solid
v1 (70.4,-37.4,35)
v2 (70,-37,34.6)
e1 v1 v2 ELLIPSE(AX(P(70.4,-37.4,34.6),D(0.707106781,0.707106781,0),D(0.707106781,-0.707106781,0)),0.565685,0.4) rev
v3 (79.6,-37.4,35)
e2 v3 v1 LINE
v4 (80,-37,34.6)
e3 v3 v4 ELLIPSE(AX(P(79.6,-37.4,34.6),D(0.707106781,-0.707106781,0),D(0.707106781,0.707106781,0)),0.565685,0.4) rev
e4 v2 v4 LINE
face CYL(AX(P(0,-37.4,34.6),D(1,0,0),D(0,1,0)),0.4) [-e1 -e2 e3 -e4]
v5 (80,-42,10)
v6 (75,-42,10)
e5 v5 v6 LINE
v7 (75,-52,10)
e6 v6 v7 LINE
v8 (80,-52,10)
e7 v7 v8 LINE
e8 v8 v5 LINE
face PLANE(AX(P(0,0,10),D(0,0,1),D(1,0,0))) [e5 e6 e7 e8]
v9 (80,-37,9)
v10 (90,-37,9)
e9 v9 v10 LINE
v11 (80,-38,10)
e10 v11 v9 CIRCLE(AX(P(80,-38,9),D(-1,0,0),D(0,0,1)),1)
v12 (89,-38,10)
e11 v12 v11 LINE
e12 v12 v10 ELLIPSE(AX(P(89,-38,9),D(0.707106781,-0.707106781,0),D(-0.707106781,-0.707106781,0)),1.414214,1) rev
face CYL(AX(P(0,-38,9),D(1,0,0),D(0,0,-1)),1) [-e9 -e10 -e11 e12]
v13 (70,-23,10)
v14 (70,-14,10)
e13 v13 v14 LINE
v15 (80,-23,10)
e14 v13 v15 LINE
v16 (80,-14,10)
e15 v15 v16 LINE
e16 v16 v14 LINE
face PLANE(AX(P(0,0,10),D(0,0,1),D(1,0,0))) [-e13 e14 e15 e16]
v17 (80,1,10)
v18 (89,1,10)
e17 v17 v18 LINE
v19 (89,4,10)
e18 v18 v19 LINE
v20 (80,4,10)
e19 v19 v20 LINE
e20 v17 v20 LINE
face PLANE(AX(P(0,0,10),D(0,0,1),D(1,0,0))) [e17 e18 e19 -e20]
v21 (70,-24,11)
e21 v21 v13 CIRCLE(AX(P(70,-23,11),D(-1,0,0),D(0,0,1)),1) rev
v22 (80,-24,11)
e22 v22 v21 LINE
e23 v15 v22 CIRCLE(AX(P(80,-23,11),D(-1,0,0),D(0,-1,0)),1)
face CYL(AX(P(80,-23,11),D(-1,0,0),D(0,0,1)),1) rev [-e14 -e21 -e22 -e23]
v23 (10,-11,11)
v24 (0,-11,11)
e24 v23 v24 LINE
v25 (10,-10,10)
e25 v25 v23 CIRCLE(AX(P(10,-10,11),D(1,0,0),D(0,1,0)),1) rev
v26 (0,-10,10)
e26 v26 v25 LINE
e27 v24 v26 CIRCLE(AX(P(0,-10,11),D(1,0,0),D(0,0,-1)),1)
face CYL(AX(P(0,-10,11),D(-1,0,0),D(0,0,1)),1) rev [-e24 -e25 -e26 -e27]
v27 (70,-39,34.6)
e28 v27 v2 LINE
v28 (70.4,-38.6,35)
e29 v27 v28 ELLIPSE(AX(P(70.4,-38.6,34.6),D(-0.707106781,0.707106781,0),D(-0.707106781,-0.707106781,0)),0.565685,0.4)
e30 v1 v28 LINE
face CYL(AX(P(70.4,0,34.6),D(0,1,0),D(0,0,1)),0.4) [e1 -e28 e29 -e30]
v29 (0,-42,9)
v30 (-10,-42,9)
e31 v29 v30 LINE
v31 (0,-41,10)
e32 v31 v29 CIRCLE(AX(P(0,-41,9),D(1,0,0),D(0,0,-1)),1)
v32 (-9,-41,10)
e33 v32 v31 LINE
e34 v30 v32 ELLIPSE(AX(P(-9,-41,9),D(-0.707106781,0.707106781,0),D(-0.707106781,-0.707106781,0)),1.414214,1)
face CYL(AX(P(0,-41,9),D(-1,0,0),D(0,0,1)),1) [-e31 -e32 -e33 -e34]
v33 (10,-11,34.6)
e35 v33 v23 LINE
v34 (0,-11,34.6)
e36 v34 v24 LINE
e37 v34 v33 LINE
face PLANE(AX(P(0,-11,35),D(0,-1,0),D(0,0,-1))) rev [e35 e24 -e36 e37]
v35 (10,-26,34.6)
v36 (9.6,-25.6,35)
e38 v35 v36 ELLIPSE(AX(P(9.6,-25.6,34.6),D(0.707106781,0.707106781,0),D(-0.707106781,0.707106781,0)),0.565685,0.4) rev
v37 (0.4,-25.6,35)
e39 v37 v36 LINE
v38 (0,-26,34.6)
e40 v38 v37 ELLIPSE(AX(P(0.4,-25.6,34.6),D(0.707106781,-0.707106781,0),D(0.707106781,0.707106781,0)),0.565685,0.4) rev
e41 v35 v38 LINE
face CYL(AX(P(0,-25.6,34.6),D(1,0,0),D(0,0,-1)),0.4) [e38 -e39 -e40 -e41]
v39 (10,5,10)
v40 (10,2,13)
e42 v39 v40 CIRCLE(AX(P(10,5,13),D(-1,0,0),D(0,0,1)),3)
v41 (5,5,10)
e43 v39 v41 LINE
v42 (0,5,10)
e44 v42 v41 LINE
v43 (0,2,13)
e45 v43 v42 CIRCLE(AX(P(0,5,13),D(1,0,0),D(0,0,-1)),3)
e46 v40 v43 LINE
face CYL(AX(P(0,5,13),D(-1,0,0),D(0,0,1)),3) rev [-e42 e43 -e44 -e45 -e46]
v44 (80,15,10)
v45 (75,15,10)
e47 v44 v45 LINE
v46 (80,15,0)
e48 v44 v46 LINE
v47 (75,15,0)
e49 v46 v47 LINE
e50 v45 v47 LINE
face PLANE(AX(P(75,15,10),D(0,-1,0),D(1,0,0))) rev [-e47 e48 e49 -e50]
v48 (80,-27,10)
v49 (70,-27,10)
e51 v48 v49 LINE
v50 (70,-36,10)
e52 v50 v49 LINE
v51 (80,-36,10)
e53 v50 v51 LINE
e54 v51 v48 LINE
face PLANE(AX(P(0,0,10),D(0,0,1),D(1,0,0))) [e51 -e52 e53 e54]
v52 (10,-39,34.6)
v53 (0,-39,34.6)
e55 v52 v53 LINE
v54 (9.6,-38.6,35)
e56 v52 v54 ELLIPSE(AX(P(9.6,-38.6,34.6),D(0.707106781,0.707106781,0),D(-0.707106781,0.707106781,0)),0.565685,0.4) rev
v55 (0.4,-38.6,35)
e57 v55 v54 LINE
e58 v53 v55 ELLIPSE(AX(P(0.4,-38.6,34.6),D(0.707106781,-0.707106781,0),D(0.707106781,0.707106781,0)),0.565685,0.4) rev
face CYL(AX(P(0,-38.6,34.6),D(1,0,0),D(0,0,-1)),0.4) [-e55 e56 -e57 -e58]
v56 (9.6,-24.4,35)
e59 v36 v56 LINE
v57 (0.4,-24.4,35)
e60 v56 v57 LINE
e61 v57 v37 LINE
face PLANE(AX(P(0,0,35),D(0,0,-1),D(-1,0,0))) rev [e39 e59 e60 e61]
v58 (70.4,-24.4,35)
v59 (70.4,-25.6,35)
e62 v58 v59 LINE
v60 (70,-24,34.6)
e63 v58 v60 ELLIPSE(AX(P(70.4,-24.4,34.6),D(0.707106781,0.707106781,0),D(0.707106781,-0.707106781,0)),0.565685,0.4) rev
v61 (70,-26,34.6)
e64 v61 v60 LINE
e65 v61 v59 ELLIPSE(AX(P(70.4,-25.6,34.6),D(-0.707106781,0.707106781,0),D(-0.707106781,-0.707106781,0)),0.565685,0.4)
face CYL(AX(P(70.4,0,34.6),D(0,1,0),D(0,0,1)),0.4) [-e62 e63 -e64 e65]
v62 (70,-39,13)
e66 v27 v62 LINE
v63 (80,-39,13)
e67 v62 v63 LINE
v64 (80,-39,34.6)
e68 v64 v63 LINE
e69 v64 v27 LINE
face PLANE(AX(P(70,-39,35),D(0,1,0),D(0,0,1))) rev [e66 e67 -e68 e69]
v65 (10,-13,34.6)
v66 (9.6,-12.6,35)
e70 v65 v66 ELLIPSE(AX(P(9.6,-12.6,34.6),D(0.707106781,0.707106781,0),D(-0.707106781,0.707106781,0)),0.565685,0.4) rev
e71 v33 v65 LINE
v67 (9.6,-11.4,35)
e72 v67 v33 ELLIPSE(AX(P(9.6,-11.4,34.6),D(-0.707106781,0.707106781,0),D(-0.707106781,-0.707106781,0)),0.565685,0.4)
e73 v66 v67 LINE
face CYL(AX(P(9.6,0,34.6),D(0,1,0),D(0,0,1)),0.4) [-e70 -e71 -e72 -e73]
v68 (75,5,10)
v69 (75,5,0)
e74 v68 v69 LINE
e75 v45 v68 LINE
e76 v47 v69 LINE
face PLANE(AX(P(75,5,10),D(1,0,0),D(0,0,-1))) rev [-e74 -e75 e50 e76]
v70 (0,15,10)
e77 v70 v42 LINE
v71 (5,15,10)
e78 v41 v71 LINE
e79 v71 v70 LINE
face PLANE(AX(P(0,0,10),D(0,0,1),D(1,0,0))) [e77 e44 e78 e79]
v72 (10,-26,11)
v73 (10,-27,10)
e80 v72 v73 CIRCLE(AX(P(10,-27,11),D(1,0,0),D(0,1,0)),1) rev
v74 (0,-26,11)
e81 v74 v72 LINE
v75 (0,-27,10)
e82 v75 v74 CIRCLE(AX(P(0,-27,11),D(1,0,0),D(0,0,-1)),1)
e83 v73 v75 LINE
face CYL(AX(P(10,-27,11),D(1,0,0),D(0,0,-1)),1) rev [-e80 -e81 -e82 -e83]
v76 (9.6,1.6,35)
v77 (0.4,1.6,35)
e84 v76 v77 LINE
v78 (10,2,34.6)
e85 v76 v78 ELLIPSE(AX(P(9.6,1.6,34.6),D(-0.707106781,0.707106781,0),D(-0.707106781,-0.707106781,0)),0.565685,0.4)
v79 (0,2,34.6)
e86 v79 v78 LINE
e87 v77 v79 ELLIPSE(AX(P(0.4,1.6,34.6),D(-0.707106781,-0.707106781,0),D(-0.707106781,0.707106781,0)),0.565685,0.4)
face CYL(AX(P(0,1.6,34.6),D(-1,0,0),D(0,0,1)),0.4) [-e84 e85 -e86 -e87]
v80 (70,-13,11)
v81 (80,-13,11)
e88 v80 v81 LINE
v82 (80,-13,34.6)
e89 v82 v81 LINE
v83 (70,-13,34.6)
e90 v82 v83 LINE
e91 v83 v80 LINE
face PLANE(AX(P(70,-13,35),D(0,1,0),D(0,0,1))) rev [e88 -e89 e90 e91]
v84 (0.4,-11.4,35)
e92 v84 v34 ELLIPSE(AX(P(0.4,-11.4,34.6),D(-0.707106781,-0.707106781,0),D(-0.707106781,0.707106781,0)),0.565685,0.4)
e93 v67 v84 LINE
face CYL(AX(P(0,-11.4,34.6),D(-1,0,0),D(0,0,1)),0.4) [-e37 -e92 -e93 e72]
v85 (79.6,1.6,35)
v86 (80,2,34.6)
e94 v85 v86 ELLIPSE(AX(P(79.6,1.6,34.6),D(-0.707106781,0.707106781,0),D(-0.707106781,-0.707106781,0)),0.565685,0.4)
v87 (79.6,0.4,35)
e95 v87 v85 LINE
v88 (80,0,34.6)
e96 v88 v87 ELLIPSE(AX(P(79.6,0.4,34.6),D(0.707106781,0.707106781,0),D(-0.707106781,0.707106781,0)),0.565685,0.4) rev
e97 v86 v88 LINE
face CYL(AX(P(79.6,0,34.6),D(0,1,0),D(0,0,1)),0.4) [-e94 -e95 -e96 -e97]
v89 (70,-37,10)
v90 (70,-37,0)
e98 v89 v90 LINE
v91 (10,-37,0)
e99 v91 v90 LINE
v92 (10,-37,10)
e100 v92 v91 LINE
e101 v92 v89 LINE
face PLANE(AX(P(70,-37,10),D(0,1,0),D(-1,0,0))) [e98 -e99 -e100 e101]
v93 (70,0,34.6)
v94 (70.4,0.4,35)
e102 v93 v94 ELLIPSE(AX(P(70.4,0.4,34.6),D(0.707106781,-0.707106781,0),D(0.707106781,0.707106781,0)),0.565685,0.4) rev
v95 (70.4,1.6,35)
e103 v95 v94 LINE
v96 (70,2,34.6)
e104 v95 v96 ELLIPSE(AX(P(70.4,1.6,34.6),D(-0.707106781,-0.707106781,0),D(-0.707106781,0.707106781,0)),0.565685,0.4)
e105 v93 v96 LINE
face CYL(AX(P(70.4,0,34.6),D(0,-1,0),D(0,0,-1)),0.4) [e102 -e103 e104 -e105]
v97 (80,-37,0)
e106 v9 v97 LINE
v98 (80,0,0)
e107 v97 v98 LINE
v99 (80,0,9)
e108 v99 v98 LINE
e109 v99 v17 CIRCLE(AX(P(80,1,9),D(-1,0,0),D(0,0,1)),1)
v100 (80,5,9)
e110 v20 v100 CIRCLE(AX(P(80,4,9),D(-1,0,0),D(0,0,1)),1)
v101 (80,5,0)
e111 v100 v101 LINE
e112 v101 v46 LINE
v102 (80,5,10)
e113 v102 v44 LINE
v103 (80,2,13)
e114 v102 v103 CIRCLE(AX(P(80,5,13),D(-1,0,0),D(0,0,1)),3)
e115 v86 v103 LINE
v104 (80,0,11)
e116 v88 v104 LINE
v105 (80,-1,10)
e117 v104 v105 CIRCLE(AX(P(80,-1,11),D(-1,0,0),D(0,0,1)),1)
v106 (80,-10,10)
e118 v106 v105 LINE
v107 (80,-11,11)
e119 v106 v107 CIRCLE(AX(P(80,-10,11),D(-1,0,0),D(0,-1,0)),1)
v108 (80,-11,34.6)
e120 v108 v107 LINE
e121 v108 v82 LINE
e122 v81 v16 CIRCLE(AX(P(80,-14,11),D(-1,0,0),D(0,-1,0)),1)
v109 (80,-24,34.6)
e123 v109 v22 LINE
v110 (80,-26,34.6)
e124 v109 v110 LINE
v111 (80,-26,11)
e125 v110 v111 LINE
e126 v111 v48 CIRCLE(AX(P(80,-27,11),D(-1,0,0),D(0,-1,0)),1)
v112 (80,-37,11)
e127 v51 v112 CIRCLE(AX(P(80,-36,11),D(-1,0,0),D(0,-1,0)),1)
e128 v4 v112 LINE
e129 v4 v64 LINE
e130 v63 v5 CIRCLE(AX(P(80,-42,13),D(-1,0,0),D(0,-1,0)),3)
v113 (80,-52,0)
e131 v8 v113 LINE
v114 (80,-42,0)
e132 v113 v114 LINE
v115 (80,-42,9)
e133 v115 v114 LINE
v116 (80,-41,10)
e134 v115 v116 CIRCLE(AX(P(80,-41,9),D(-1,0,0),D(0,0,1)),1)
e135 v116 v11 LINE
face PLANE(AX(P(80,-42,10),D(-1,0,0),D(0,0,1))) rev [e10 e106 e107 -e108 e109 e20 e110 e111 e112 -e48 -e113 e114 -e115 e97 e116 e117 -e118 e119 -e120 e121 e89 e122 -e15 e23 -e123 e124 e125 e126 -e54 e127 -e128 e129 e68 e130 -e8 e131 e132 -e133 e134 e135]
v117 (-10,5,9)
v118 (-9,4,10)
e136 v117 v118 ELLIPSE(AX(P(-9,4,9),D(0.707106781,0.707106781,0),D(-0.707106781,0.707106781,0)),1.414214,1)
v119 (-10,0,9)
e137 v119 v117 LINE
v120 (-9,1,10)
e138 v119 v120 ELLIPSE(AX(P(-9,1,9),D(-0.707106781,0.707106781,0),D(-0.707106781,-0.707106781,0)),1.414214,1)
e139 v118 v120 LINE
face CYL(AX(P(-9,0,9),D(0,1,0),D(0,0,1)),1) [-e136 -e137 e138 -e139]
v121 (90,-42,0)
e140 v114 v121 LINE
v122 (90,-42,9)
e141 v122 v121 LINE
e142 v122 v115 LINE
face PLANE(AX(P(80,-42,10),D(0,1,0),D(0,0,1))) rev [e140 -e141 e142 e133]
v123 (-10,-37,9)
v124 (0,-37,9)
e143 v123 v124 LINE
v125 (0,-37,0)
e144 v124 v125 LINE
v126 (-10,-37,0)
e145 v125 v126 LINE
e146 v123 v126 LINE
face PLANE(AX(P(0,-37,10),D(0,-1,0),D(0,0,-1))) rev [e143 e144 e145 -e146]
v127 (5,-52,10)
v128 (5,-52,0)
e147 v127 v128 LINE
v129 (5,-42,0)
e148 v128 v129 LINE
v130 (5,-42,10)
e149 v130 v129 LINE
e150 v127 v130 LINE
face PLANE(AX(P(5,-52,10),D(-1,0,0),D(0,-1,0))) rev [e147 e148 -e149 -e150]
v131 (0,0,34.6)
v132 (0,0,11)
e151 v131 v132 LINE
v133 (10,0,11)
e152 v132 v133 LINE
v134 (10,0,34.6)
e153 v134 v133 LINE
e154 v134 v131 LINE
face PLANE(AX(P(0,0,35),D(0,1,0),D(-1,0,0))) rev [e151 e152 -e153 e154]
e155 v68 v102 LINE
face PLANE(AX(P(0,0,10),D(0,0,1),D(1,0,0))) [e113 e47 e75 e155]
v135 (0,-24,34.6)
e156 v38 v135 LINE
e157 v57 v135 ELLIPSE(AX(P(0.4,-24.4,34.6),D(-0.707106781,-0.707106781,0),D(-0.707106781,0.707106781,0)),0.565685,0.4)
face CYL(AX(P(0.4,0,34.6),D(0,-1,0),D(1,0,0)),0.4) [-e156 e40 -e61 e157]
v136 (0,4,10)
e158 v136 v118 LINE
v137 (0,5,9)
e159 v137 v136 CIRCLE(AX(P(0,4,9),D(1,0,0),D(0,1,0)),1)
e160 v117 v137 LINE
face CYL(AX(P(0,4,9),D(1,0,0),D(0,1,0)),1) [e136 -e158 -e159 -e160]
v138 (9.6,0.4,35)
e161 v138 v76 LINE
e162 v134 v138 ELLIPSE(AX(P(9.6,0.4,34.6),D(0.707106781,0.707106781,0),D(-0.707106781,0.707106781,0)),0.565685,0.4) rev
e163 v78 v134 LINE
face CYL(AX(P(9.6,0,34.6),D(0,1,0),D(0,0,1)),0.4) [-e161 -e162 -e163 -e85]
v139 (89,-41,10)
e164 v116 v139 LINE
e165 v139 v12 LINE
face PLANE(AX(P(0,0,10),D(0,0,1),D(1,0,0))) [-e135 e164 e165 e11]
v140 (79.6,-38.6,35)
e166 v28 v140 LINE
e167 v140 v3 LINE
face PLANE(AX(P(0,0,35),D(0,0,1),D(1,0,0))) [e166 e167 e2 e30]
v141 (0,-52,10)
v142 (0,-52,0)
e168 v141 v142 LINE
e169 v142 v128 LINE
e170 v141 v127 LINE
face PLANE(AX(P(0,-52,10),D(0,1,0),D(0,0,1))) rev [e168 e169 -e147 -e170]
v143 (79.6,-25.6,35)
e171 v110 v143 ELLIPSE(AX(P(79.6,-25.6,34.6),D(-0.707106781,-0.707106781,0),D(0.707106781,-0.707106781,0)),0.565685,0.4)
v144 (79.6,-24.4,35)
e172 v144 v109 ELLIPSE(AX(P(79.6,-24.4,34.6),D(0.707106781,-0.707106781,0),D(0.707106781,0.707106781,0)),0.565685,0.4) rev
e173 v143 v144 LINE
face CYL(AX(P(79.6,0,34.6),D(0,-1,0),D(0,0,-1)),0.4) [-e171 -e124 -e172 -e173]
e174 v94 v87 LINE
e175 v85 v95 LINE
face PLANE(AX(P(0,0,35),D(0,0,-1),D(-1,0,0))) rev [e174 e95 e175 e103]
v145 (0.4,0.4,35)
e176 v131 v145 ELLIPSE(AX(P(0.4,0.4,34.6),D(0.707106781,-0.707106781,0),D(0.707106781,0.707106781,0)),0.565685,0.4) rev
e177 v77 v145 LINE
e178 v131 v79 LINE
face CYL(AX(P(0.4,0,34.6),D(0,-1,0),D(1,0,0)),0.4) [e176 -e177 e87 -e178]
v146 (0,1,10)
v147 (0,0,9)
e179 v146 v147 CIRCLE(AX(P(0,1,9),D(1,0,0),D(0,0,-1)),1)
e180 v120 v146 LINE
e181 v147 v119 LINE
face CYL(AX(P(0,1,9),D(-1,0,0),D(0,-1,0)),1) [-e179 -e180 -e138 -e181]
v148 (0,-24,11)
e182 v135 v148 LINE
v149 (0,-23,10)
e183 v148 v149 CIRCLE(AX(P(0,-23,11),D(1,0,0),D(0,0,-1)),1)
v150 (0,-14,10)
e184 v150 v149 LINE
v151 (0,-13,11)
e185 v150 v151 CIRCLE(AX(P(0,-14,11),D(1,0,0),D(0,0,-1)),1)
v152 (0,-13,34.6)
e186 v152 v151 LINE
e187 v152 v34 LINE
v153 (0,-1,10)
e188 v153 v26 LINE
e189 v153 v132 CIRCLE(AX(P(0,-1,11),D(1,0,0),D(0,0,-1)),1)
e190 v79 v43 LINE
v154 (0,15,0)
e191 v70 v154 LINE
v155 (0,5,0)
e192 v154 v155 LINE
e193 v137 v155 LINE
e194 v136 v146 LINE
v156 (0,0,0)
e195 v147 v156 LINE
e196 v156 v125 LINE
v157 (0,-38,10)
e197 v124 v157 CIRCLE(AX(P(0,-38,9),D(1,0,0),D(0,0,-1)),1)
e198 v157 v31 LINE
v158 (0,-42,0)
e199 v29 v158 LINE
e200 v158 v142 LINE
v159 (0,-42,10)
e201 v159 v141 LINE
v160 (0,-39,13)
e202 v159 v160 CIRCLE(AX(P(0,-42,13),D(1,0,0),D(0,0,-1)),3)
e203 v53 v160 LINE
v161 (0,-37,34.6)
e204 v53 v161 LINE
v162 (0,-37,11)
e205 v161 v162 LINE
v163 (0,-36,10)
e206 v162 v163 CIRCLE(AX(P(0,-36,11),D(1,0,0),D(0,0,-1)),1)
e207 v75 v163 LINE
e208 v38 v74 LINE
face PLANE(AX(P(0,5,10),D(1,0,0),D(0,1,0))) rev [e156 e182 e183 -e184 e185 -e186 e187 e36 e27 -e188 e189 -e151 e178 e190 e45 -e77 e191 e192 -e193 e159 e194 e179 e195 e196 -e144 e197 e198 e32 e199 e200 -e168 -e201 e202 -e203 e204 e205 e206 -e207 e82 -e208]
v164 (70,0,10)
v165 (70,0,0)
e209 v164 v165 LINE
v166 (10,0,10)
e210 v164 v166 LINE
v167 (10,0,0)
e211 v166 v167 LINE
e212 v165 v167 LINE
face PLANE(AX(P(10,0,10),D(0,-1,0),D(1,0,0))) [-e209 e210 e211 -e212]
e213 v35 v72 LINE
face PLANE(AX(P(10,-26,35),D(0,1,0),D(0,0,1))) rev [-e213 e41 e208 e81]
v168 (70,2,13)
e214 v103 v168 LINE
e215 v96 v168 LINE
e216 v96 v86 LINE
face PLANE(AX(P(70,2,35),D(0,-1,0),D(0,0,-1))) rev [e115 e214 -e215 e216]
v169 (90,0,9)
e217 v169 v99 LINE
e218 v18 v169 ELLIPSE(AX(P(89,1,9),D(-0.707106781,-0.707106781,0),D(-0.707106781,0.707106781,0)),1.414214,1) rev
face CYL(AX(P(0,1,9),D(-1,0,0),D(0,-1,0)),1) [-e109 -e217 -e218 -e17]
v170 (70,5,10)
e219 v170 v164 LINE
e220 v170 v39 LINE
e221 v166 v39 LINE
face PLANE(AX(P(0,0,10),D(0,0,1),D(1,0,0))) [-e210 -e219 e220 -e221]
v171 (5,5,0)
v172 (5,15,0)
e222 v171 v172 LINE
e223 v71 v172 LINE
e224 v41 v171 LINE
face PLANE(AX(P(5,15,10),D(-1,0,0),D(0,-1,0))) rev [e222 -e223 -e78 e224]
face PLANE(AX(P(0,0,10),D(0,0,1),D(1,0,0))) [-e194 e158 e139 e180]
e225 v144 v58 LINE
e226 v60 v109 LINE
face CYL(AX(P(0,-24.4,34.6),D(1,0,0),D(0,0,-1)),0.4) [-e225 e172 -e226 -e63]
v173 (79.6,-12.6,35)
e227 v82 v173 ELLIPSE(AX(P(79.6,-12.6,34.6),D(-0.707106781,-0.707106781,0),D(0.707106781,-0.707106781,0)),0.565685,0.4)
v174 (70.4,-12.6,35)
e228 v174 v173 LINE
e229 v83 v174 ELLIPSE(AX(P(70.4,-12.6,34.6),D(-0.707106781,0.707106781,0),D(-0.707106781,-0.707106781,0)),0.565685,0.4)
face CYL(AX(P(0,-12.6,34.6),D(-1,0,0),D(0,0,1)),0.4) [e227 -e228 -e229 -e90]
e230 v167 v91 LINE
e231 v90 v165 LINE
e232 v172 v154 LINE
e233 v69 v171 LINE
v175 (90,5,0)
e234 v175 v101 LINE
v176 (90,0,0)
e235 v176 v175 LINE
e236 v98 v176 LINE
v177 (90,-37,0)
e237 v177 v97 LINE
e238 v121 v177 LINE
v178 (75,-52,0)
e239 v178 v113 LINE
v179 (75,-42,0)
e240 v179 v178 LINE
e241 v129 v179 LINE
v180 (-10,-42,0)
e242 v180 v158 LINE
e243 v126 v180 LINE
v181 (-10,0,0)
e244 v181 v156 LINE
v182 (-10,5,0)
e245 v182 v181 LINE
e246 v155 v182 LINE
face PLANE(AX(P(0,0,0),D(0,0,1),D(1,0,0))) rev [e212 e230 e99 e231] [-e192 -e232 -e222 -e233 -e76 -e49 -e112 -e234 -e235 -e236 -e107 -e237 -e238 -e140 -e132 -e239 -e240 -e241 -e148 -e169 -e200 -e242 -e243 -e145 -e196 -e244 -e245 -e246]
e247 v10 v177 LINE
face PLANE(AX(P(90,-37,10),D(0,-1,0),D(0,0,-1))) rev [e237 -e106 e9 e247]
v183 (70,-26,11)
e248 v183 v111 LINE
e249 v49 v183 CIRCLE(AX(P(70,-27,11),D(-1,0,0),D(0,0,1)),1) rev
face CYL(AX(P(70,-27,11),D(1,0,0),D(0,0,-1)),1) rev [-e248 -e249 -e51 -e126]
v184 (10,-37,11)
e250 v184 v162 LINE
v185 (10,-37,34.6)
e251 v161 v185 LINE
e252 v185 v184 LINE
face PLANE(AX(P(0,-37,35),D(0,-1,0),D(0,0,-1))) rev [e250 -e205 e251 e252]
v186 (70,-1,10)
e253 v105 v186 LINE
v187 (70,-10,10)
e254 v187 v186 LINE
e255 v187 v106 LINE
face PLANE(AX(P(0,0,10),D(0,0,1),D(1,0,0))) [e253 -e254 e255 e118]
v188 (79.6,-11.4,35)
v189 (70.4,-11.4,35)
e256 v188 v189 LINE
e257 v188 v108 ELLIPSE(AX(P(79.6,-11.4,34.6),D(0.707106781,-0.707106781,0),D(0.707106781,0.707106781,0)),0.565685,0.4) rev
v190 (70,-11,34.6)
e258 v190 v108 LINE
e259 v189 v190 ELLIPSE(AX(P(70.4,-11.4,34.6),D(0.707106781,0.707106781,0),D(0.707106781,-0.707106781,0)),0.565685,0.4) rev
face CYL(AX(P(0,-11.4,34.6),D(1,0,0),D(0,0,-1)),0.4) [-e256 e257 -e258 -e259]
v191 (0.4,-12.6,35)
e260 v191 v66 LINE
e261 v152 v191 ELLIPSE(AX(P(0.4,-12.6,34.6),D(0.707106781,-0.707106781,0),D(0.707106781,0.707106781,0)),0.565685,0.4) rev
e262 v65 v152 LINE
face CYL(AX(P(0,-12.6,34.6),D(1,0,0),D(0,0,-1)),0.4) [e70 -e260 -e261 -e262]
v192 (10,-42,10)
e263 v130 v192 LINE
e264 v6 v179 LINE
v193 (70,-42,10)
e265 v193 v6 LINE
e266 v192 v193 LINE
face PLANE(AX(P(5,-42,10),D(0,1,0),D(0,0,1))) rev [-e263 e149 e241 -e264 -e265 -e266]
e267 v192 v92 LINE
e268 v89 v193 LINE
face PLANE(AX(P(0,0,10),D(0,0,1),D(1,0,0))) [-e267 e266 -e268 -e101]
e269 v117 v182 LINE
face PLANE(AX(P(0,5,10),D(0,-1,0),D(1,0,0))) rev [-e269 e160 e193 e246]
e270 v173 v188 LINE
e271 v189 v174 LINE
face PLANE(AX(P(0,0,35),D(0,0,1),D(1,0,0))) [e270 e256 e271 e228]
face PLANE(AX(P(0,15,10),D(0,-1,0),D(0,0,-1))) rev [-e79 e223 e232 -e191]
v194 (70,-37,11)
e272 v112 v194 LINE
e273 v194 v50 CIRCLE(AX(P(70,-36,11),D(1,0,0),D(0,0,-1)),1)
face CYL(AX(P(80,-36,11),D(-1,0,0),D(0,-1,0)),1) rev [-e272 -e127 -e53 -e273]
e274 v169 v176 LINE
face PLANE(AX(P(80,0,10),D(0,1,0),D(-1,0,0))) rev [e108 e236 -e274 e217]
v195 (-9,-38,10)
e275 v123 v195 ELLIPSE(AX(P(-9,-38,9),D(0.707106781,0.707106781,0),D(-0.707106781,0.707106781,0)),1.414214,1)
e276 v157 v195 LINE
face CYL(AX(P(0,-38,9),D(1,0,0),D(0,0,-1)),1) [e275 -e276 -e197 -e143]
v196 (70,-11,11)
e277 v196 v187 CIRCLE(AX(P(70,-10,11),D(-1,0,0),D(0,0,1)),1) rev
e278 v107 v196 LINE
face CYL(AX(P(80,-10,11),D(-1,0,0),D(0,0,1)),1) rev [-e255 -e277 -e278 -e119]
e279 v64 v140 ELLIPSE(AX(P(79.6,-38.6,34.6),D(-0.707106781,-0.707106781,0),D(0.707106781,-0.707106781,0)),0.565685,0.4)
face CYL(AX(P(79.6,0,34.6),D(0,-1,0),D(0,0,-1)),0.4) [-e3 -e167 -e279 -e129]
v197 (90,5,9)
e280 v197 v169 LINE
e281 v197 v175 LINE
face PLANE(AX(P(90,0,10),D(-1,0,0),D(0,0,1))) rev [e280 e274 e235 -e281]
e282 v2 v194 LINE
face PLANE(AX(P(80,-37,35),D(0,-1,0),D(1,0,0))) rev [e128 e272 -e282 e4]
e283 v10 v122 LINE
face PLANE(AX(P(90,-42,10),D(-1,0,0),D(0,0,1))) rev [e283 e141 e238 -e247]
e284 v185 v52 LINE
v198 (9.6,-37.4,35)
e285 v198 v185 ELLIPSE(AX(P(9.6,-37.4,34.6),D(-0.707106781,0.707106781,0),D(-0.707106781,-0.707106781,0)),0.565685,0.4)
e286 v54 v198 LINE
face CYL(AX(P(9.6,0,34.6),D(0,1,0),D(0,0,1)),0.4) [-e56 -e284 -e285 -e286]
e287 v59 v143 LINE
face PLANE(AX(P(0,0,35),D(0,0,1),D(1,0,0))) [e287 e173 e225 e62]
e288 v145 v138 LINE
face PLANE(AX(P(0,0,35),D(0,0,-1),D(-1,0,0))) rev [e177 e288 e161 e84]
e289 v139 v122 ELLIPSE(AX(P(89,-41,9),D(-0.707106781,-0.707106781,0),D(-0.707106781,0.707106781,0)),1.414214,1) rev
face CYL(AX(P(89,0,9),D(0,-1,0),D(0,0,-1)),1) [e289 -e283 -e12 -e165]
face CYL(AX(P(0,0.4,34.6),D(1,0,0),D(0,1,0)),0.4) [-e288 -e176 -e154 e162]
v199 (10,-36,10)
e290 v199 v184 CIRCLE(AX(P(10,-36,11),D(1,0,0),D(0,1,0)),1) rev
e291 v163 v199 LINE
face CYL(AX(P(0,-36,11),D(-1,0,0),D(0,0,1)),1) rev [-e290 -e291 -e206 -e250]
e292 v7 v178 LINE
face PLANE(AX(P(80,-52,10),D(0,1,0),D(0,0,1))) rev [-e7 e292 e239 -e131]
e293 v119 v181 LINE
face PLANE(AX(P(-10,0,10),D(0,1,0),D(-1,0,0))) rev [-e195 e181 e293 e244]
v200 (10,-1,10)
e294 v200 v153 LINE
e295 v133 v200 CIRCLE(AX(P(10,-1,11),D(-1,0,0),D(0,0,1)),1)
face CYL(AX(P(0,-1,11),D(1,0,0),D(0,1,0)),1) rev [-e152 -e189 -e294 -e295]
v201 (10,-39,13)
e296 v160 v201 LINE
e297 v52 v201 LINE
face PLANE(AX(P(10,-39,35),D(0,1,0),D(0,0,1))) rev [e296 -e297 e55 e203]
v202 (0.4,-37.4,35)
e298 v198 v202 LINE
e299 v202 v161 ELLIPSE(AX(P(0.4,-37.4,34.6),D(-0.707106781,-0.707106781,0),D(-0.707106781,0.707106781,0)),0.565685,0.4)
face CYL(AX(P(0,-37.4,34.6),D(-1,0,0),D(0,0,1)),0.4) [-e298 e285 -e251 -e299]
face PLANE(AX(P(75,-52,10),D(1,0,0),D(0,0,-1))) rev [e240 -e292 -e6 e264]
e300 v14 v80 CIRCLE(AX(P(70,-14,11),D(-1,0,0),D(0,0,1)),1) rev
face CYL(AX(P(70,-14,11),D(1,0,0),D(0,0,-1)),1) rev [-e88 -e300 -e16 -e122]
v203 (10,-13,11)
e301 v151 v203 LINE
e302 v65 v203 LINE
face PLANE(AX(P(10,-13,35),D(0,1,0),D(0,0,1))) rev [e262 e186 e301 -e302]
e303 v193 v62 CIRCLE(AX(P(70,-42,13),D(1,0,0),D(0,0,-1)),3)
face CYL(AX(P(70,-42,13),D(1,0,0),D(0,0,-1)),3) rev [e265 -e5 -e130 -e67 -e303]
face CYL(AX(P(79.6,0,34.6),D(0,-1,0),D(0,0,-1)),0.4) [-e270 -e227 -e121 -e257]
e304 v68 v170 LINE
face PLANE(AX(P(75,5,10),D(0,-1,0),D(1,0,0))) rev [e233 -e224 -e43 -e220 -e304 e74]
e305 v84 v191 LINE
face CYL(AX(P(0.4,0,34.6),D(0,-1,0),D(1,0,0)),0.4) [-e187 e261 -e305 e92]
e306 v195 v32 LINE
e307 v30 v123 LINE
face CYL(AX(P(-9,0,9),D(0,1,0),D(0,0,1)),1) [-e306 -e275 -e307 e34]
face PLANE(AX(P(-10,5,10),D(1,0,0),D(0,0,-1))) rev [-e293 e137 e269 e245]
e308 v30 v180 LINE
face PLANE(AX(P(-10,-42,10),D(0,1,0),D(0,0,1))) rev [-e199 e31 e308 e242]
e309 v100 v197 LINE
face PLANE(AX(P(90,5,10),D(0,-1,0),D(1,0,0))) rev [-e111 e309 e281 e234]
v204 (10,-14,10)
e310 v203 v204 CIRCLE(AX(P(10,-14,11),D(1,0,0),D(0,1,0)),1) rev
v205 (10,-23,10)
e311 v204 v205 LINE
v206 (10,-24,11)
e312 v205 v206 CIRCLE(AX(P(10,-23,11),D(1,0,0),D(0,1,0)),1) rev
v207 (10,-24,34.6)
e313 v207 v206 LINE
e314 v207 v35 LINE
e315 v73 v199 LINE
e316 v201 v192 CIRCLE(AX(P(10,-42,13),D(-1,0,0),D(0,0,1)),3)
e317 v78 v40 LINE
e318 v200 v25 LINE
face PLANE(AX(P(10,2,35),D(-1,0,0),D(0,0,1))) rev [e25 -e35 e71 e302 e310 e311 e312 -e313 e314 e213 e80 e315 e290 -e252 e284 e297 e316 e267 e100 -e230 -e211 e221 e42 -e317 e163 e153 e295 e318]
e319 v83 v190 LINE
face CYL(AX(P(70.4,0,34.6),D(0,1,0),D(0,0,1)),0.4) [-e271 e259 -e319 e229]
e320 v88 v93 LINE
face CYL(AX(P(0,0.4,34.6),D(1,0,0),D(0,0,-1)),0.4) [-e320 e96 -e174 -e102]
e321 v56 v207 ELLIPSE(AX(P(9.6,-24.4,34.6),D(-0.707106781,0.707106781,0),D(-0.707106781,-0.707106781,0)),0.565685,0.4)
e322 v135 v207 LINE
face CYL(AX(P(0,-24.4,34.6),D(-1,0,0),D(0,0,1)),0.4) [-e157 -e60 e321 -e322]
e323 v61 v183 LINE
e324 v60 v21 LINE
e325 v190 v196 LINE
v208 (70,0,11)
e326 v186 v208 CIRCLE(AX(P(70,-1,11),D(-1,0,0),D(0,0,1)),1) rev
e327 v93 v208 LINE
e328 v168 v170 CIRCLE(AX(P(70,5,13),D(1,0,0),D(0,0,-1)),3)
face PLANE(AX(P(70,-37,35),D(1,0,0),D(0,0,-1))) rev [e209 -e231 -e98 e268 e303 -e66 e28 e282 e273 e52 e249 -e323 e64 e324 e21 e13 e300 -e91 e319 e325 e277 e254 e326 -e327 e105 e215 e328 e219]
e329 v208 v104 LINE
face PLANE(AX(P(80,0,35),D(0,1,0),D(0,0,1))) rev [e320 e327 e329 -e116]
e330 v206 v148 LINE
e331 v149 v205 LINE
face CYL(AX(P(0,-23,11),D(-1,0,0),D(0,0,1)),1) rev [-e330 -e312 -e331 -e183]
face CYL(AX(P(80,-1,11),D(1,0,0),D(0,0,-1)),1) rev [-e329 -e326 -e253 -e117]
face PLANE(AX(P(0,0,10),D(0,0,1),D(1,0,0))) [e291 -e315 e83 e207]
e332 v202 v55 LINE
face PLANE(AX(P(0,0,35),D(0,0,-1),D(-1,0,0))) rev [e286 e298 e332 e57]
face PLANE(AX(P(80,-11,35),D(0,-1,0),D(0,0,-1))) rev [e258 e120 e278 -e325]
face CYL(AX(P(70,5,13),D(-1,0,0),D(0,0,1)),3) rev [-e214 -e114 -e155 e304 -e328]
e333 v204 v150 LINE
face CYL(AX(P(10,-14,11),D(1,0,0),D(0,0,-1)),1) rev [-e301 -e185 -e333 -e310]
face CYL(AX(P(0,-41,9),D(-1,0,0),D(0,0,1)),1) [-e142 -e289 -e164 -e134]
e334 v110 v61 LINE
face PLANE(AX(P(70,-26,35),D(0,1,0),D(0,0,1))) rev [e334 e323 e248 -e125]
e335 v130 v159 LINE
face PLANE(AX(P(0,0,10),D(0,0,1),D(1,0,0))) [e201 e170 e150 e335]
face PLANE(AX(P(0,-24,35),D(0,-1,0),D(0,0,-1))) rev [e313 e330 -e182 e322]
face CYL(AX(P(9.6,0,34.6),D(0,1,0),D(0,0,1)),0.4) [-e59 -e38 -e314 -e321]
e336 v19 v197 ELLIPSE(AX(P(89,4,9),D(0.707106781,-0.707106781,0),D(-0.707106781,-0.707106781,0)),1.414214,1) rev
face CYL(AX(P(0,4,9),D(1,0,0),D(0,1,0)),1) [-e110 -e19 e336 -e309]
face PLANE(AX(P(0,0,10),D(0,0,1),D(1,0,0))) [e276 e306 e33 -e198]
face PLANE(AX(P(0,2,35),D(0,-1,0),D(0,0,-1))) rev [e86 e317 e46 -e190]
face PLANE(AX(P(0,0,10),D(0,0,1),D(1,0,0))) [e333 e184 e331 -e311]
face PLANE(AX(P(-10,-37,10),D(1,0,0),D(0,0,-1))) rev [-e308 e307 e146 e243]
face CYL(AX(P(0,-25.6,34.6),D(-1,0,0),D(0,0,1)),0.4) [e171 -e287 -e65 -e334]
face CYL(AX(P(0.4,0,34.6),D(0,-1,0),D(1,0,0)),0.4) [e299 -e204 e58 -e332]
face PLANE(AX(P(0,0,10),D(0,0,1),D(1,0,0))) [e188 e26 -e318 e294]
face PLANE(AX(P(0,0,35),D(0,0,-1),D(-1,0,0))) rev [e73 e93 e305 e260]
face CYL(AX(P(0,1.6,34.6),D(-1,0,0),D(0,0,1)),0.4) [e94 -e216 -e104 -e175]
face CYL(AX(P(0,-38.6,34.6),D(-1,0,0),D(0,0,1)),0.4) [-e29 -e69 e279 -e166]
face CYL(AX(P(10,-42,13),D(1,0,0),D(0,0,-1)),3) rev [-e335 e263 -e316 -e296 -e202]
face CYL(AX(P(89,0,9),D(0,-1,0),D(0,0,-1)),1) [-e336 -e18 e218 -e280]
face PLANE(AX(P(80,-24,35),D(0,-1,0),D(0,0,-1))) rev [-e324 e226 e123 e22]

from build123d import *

# Parameters (mm, degrees)
SKETCH2_W           = 37
SKETCH2_H           = 60
BOSS_EXTRUDE1_DEPTH = 10
SKETCH3_W           = 10
SKETCH3_H           = 2
BOSS_EXTRUDE2_DEPTH = 25
FILLET1_R           = 3
FILLET2_R           = 3
FILLET3_R           = 1
FILLET6_START       = -11
FILLET6_DEPTH       = 11
FILLET6_START_2     = -43
FILLET6_2_DEPTH     = 7
FILLET6_3_DEPTH     = 11
FILLET7_START       = -11
FILLET7_DEPTH       = 11
FILLET7_START_2     = -1
FILLET7_2_DEPTH     = 7
FILLET8_R           = 1
FILLET9_R           = 1
FILLET10_R          = 0.4


with BuildPart() as part:
    # Sketch2 → Boss-Extrude1 (new body)
    with BuildSketch(Plane(origin=(0, 0, 0), x_dir=(0, 1, 0), z_dir=(0, 0, 1))):
        Polygon((-42, 10), (-42, 0), (-52, 0), (-52, -5), (-42, -5), (-42, -75), (-52, -75), (-52, -80), (-42, -80), (-42, -90), (-37, -90), (-37, -80), (0, -80), (0, -90), (5, -90), (5, -80), (15, -80), (15, -75), (5, -75), (5, -5), (15, -5), (15, 0), (5, 0), (5, 10), (0, 10), (0, 0), (-37, 0), (-37, 10), align=None)
        with Locations((-18.5, -40)):
            Rectangle(SKETCH2_W, SKETCH2_H, mode=Mode.SUBTRACT)
    extrude(amount=BOSS_EXTRUDE1_DEPTH)

    # Sketch3 → Boss-Extrude2 (add)
    with BuildSketch(Plane.XY.offset(10)):
        with Locations((5, 1)):
            Rectangle(SKETCH3_W, SKETCH3_H)
        with Locations((5, -12)):
            Rectangle(SKETCH3_W, SKETCH3_H)
        with Locations((5, -25)):
            Rectangle(SKETCH3_W, SKETCH3_H)
        with Locations((5, -38)):
            Rectangle(SKETCH3_W, SKETCH3_H)
        with Locations((75, 1)):
            Rectangle(SKETCH3_W, SKETCH3_H)
        with Locations((75, -12)):
            Rectangle(SKETCH3_W, SKETCH3_H)
        with Locations((75, -25)):
            Rectangle(SKETCH3_W, SKETCH3_H)
        with Locations((75, -38)):
            Rectangle(SKETCH3_W, SKETCH3_H)
    extrude(amount=BOSS_EXTRUDE2_DEPTH)

    # Fillet1
    fillet1_edges = [part.edges().sort_by_distance(p)[0] for p in [
        (5, -39, 10),
        (75, -39, 10),
    ]]
    fillet(fillet1_edges, radius=FILLET1_R - 0.0001)  # a hair under: the kernel refuses the full size

    # Fillet2
    fillet2_edges = [part.edges().sort_by_distance(p)[0] for p in [
        (75, 2, 10),
        (5, 2, 10),
    ]]
    fillet(fillet2_edges, radius=FILLET2_R - 0.0001)  # a hair under: the kernel refuses the full size

    # Fillet3
    # the kernel refuses this fillet: 1 mm, written as the material it adds along each edge
    with BuildSketch(Plane(origin=(80, 0, 10), x_dir=(0, -1, 0), z_dir=(-1, 0, 0)), Plane(origin=(10, -26, 10), x_dir=(0, -1, 0), z_dir=(-1, 0, 0)), Plane(origin=(10, -13, 10), x_dir=(0, -1, 0), z_dir=(-1, 0, 0)), Plane(origin=(80, -11, 10), x_dir=(0, 0, 1), z_dir=(-1, 0, 0)), Plane(origin=(80, -24, 10), x_dir=(0, 0, 1), z_dir=(-1, 0, 0)), Plane(origin=(80, -37, 10), x_dir=(0, 0, 1), z_dir=(-1, 0, 0)), Plane(origin=(10, 0, 10), x_dir=(0, -1, 0), z_dir=(-1, 0, 0))) as fillet3_piece_1:
        with BuildLine():
            CenterArc((FILLET3_R, FILLET3_R), FILLET3_R, 180, 90)
            Line((0, FILLET3_R), (0, 0))
            Line((0, 0), (FILLET3_R, 0))
        make_face()
    extrude(amount=10)
    with BuildSketch(Plane(origin=(0, -37, 10), x_dir=(0, 0, 1), z_dir=(1, 0, 0)), Plane(origin=(0, -24, 10), x_dir=(0, 0, 1), z_dir=(1, 0, 0)), Plane(origin=(0, -11, 10), x_dir=(0, 0, 1), z_dir=(1, 0, 0)), Plane(origin=(70, -13, 10), x_dir=(0, -1, 0), z_dir=(1, 0, 0)), Plane(origin=(70, -26, 10), x_dir=(0, -1, 0), z_dir=(1, 0, 0))) as fillet3_piece_2:
        with BuildLine():
            CenterArc((FILLET3_R, -FILLET3_R), FILLET3_R, 90, 90)
            Line((0, -FILLET3_R), (0, 0))
            Line((0, 0), (FILLET3_R, 0))
        make_face()
    extrude(amount=10)

    # Fillet6: read off the stored shape, not the designer's step
    # Fillet6 outline → Fillet6 (cut)
    with BuildSketch(Plane.YZ.offset(FILLET6_START)):
        with BuildLine():
            Line((-42, 10), (-42, 9))
            ThreePointArc((-42, 9), (-41.707106781, 9.707106781), (-41, 10))
            Line((-41, 10), (-42, 10))
        make_face()
    extrude(amount=FILLET6_DEPTH, mode=Mode.SUBTRACT)

    # Fillet6 2 outline → Fillet6 2 (cut)
    with BuildSketch(Plane(origin=(0, 0, 0), x_dir=(1, 0, 0), z_dir=(0, 1, 0)).offset(FILLET6_START_2)):
        with BuildLine():
            ThreePointArc((-9, -10), (-9.707106781, -9.707106781), (-10, -9))
            Line((-10, -9), (-10, -10))
            Line((-10, -10), (-9, -10))
        make_face()
    extrude(amount=FILLET6_2_DEPTH, mode=Mode.SUBTRACT)

    # Fillet6 3 outline → Fillet6 3 (cut)
    with BuildSketch(Plane.YZ.offset(FILLET6_START)):
        with BuildLine():
            ThreePointArc((-38, 10), (-37.292893219, 9.707106781), (-37, 9))
            Line((-37, 9), (-37, 10))
            Line((-37, 10), (-38, 10))
        make_face()
    extrude(amount=FILLET6_3_DEPTH, mode=Mode.SUBTRACT)

    # Fillet7: read off the stored shape, not the designer's step
    # Fillet7 outline → Fillet7 (cut)
    with BuildSketch(Plane.YZ.offset(FILLET7_START)):
        with BuildLine():
            Line((0, 10), (0, 9))
            ThreePointArc((0, 9), (0.292893219, 9.707106781), (1, 10))
            Line((1, 10), (0, 10))
        make_face()
        with BuildLine():
            Line((5, 10), (4, 10))
            ThreePointArc((4, 10), (4.707106781, 9.707106781), (5, 9))
            Line((5, 9), (5, 10))
        make_face()
    extrude(amount=FILLET7_DEPTH, mode=Mode.SUBTRACT)

    # Fillet7 2 outline → Fillet7 2 (cut)
    with BuildSketch(Plane(origin=(0, 0, 0), x_dir=(1, 0, 0), z_dir=(0, 1, 0)).offset(FILLET7_START_2)):
        with BuildLine():
            ThreePointArc((-9, -10), (-9.707106781, -9.707106781), (-10, -9))
            Line((-10, -9), (-10, -10))
            Line((-10, -10), (-9, -10))
        make_face()
    extrude(amount=FILLET7_2_DEPTH, mode=Mode.SUBTRACT)

    # Fillet8
    # the kernel refuses this fillet: 1 mm, written as the material it takes off along each edge
    with BuildSketch(Plane(origin=(80, 0, 10), x_dir=(0, 1, 0), z_dir=(1, 0, 0)), Plane(origin=(92.5, 5, 10), x_dir=(0, -1, 0), z_dir=(-1, 0, 0))) as fillet8_piece_1:
        with BuildLine():
            CenterArc((FILLET8_R, -FILLET8_R), FILLET8_R, 90, 90)
            Line((0, -FILLET8_R), (0, 0))
            Line((0, 0), (FILLET8_R, 0))
        make_face()
    extrude(amount=12.5, mode=Mode.SUBTRACT)
    with BuildSketch(Plane(origin=(90, -2.5, 10), x_dir=(-1, 0, 0), z_dir=(0, 1, 0))) as fillet8_piece_2:
        with BuildLine():
            CenterArc((FILLET8_R, -FILLET8_R), FILLET8_R, 90, 90)
            Line((0, -FILLET8_R), (0, 0))
            Line((0, 0), (FILLET8_R, 0))
        make_face()
    extrude(amount=10, mode=Mode.SUBTRACT)

    # Fillet9
    # the kernel refuses this fillet: 1 mm, written as the material it takes off along each edge
    with BuildSketch(Plane(origin=(80, -42, 10), x_dir=(0, 1, 0), z_dir=(1, 0, 0)), Plane(origin=(92.5, -37, 10), x_dir=(0, -1, 0), z_dir=(-1, 0, 0))) as fillet9_piece_1:
        with BuildLine():
            CenterArc((FILLET9_R, -FILLET9_R), FILLET9_R, 90, 90)
            Line((0, -FILLET9_R), (0, 0))
            Line((0, 0), (FILLET9_R, 0))
        make_face()
    extrude(amount=12.5, mode=Mode.SUBTRACT)
    with BuildSketch(Plane(origin=(90, -44.5, 10), x_dir=(-1, 0, 0), z_dir=(0, 1, 0))) as fillet9_piece_2:
        with BuildLine():
            CenterArc((FILLET9_R, -FILLET9_R), FILLET9_R, 90, 90)
            Line((0, -FILLET9_R), (0, 0))
            Line((0, 0), (FILLET9_R, 0))
        make_face()
    extrude(amount=10, mode=Mode.SUBTRACT)

    # Fillet10
    fillet10_edges = [part.edges().sort_by_distance(p)[0] for p in [
        (75, 0, 35),
        (80, 1, 35),
        (75, 2, 35),
        (70, 1, 35),
        (5, -37, 35),
        (0, -38, 35),
        (5, -39, 35),
        (10, -38, 35),
        (5, -24, 35),
        (0, -25, 35),
        (5, -26, 35),
        (10, -25, 35),
        (5, -11, 35),
        (0, -12, 35),
        (5, -13, 35),
        (10, -12, 35),
        (75, -11, 35),
        (70, -12, 35),
        (75, -13, 35),
        (80, -12, 35),
        (75, -24, 35),
        (70, -25, 35),
        (75, -26, 35),
        (80, -25, 35),
        (75, -37, 35),
        (70, -38, 35),
        (75, -39, 35),
        (80, -38, 35),
        (5, 0, 35),
        (10, 1, 35),
        (5, 2, 35),
        (0, 1, 35),
    ]]
    fillet(fillet10_edges, radius=FILLET10_R)


solid = part.part
